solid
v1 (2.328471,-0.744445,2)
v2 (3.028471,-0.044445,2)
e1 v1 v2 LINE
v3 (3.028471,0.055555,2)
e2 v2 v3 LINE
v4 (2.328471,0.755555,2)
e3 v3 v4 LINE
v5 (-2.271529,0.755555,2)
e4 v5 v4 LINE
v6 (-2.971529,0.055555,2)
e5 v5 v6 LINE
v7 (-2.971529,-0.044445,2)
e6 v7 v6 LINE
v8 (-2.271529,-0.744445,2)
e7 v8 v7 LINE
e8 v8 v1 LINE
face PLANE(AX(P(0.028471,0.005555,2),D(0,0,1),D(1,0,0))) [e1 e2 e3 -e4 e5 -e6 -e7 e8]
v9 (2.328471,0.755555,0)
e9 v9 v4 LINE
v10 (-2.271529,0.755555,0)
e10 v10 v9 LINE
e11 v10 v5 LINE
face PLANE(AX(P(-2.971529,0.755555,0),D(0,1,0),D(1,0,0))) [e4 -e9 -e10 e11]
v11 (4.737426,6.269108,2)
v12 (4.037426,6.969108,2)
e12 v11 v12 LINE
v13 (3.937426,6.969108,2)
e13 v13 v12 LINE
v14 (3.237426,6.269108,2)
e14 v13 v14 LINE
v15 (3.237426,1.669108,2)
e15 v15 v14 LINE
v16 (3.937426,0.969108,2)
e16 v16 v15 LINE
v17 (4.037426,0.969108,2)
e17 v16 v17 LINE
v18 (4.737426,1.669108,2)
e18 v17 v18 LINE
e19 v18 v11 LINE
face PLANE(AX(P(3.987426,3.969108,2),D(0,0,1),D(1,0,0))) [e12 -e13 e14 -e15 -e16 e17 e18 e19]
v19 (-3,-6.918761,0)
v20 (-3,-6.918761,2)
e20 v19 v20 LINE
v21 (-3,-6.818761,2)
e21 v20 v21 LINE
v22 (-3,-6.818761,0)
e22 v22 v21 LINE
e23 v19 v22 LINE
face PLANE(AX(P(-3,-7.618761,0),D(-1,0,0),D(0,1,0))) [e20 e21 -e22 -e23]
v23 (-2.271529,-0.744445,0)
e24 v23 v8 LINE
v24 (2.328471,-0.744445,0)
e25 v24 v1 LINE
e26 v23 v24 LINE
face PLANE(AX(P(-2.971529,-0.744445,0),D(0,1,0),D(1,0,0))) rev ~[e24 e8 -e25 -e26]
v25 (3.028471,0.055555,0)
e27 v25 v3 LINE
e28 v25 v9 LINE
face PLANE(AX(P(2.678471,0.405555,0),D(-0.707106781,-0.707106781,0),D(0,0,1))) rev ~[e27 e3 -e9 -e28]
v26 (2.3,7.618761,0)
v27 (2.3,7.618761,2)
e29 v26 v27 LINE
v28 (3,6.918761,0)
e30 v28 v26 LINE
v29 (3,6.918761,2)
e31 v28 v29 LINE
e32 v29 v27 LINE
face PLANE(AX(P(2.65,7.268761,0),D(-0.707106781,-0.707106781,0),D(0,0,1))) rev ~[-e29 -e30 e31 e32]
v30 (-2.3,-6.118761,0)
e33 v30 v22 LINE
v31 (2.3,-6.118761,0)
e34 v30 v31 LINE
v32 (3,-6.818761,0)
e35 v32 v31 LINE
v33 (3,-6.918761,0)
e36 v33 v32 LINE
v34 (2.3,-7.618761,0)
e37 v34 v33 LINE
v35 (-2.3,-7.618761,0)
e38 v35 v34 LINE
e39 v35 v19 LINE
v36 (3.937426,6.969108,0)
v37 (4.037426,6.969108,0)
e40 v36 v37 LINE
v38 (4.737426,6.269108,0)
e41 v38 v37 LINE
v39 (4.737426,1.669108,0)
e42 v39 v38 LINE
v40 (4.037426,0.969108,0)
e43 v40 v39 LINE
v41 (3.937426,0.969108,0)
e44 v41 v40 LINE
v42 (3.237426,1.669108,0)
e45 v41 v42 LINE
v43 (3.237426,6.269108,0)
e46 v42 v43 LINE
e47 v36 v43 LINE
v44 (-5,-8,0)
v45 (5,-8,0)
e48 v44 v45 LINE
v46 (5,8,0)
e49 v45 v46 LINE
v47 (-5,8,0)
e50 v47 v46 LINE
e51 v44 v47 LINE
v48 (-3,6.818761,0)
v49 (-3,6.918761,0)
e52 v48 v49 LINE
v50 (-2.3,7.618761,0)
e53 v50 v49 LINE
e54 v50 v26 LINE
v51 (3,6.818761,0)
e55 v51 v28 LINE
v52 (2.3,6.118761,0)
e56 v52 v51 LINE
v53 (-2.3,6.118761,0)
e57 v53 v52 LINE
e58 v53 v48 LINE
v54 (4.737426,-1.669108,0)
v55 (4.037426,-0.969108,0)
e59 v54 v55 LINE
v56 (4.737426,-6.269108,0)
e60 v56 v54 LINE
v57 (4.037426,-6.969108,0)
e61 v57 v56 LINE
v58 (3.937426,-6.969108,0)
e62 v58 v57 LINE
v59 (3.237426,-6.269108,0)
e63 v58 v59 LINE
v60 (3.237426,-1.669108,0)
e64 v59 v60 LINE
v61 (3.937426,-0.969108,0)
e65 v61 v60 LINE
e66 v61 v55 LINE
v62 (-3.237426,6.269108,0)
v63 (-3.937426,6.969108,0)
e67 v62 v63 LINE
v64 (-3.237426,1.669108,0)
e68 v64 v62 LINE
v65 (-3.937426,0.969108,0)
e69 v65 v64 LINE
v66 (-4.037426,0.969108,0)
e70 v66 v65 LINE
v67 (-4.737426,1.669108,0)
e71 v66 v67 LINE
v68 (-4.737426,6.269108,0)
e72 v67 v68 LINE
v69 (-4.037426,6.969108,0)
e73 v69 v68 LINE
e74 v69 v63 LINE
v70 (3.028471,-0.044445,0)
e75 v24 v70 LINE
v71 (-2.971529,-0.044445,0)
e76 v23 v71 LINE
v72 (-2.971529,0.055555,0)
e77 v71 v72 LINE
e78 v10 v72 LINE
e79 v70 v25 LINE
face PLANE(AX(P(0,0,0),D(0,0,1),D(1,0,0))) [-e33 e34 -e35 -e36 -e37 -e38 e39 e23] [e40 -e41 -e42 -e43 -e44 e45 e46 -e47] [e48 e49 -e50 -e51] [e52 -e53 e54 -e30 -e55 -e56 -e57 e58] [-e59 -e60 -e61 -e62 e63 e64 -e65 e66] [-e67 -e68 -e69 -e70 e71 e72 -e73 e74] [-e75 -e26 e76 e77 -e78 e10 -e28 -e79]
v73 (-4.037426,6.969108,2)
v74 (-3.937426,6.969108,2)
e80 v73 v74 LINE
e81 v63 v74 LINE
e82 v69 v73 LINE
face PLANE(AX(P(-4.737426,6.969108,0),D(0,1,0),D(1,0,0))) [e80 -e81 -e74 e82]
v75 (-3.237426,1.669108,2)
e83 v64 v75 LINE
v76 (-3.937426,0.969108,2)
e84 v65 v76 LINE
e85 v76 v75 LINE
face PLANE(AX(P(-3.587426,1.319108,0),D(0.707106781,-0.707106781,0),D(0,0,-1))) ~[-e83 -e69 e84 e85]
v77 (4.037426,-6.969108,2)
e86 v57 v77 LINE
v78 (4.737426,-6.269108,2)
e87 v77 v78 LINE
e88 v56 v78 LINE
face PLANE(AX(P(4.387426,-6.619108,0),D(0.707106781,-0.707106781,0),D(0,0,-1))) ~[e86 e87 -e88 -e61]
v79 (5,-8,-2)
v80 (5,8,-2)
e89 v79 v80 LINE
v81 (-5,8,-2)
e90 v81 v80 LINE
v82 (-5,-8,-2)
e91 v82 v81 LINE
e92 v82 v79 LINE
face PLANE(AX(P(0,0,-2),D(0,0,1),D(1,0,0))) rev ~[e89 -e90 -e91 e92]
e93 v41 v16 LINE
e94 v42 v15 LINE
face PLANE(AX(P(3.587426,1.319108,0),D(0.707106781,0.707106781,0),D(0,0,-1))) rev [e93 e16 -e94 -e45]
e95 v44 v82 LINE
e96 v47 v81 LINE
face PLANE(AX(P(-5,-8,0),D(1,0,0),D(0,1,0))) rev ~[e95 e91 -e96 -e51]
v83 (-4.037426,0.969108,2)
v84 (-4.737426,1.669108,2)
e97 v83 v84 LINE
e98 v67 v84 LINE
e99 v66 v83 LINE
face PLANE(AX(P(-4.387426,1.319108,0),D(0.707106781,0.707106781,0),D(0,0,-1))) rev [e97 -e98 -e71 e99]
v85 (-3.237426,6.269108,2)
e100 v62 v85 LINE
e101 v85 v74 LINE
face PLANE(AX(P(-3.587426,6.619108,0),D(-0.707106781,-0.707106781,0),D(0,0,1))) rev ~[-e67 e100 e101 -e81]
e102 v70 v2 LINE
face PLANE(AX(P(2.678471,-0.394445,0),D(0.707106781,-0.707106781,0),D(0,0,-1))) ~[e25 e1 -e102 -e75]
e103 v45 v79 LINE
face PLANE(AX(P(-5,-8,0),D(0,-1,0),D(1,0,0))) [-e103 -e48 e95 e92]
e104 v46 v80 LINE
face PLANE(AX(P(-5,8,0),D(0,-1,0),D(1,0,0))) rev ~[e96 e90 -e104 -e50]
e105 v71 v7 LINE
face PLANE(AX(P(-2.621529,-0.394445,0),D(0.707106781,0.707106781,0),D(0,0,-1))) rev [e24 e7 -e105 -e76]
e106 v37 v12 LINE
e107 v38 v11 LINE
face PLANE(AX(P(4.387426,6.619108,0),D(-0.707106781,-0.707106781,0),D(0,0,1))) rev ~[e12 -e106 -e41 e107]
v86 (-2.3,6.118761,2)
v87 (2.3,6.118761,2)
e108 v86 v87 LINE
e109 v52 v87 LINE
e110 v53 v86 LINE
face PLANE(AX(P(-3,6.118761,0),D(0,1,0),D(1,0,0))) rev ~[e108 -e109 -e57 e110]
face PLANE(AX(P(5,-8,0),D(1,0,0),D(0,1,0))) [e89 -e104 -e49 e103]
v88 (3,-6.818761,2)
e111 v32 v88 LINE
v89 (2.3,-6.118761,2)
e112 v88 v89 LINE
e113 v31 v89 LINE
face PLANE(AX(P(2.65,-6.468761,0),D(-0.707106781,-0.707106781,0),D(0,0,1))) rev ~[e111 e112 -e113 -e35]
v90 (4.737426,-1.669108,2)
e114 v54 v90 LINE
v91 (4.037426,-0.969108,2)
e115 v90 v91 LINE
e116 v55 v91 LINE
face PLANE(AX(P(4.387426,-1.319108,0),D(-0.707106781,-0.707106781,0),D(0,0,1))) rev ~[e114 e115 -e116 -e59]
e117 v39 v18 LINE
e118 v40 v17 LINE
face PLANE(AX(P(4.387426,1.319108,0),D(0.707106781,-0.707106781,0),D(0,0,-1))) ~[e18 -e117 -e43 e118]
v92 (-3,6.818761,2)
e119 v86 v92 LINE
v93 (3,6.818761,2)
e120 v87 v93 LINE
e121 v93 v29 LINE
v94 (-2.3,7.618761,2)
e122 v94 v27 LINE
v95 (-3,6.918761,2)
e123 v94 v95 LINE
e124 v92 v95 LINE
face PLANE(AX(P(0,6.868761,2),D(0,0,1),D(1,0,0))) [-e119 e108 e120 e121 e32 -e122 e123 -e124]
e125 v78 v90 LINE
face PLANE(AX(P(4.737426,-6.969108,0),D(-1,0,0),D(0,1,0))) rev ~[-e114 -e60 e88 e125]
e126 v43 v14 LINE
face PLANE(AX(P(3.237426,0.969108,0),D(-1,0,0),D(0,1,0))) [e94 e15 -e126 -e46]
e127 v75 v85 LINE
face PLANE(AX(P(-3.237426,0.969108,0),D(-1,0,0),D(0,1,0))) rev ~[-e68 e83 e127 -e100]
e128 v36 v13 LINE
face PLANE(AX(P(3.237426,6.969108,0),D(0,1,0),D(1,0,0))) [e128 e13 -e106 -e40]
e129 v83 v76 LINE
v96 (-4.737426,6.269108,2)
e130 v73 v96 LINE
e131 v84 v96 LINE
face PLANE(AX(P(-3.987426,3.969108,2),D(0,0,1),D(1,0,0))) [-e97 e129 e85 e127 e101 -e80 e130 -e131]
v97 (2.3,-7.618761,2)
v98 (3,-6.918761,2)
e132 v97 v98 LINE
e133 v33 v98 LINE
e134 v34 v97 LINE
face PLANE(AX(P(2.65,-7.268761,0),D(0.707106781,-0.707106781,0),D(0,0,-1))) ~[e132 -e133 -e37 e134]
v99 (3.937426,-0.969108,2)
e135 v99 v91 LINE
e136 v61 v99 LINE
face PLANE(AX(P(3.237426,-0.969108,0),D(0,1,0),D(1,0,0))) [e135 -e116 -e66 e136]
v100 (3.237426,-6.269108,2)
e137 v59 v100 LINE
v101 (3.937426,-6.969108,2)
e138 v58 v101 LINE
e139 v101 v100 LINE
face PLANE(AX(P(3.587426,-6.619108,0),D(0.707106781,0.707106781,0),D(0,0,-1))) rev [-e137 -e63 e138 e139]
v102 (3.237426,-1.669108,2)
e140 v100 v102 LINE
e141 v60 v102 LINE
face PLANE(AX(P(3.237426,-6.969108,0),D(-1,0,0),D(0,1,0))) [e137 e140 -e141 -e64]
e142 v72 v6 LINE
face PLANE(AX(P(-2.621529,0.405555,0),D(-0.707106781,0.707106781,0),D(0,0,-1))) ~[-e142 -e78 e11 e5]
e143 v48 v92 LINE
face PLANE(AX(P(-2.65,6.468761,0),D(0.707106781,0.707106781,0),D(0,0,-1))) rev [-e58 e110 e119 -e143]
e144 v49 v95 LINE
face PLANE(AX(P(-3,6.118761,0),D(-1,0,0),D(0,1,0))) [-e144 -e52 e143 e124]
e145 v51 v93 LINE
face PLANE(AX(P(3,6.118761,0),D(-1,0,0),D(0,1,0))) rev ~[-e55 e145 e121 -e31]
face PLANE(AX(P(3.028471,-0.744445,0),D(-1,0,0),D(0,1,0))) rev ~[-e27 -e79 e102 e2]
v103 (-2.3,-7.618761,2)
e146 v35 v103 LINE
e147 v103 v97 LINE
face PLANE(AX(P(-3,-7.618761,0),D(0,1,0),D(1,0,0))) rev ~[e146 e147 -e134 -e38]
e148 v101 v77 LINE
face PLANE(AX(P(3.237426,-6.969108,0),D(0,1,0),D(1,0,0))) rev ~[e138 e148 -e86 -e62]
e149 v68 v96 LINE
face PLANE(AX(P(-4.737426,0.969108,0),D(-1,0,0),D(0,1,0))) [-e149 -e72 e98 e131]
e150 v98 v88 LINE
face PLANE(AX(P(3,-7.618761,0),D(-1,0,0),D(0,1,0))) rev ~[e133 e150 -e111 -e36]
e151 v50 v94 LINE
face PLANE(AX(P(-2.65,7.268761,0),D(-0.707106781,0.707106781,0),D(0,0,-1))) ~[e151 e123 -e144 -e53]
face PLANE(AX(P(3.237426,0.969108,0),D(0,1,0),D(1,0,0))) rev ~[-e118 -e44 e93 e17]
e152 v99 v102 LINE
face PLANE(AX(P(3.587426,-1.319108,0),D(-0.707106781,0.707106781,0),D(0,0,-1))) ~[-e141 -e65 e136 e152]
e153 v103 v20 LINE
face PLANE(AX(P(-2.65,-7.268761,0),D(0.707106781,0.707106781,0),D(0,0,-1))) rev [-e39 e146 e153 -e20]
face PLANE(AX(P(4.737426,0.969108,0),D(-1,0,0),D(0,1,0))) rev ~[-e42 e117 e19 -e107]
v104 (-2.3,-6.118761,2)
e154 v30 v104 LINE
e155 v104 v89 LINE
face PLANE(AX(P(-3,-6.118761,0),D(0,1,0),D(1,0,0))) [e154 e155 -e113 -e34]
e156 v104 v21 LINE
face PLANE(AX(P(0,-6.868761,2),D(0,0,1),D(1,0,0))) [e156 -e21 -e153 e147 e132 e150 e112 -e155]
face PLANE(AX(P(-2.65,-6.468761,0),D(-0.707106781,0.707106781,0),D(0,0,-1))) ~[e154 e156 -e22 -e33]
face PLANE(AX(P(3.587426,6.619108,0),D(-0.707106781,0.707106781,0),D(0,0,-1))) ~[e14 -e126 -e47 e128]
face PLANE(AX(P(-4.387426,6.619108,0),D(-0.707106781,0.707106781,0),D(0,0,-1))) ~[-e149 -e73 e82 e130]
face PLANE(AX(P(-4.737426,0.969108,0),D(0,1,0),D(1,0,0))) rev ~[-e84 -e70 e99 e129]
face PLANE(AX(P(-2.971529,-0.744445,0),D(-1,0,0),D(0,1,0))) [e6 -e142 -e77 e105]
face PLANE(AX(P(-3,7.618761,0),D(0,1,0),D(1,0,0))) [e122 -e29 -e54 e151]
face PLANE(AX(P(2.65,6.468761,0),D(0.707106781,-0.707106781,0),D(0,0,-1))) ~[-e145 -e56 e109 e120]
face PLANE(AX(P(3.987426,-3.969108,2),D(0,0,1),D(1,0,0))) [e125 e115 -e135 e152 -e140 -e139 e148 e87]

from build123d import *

# Parameters (mm, degrees)
F0_W     = 10
F0_H     = 16
F1_DEPTH = 2
F2_W     = 1.5
F2_H     = 6
F2_W_2   = 6
F2_H_2   = 1.5
F3_DEPTH = 2
F4_SIZE  = 0.7


# Not quite as in the source:
# - a feature names something its author has since deleted; it is built from what else it names


with BuildPart() as f1:
    # F0 (on Top) → F1 (new body)
    with BuildSketch(Plane.XY):
        Rectangle(F0_W, F0_H)
    extrude(amount=-F1_DEPTH)

    # F2 (on face) → F3 (join)
    with BuildSketch(Plane.XY):
        with Locations((-3.9874258153, 3.9691079506)):
            Rectangle(F2_W, F2_H)
        with Locations((0, 6.8687610328)):
            Rectangle(F2_W_2, F2_H_2)
        with Locations((3.9874258153, 3.9691079506)):
            Rectangle(F2_W, F2_H)
        with Locations((0.0284713751, 0.0055548735)):
            Rectangle(F2_W_2, F2_H_2)
        with Locations((0, -6.8687610328)):
            Rectangle(F2_W_2, F2_H_2)
        with Locations((3.9874258153, -3.9691079506)):
            Rectangle(F2_W, F2_H)
    extrude(amount=F3_DEPTH)

    # F4
    f4_edges = [f1.edges().sort_by_distance(p)[0] for p in [
        (3, 6.118761, 1),
        (3.237426, 6.969108, 1),
        (3.237426, 0.969108, 1),
        (4.737426, 0.969108, 1),
        (3.237426, -0.969108, 1),
        (3.028471, -0.744445, 1),
        (-2.971529, -0.744445, 1),
        (-2.971529, 0.755555, 1),
        (-3.237426, 0.969108, 1),
        (-4.737426, 0.969108, 1),
        (-4.737426, 6.969108, 1),
        (-3, 6.118761, 1),
        (-3, 7.618761, 1),
        (3.237426, -6.969108, 1),
        (4.737426, -6.969108, 1),
        (3, -7.618761, 1),
        (-3, -7.618761, 1),
        (-3, -6.118761, 1),
        (3.028471, 0.755555, 1),
        (4.737426, -0.969108, 1),
        (3, -6.118761, 1),
        (4.737426, 6.969108, 1),
        (3, 7.618761, 1),
        (-3.237426, 6.969108, 1),
    ]]
    chamfer(f4_edges, length=F4_SIZE)


solid = f1.part
